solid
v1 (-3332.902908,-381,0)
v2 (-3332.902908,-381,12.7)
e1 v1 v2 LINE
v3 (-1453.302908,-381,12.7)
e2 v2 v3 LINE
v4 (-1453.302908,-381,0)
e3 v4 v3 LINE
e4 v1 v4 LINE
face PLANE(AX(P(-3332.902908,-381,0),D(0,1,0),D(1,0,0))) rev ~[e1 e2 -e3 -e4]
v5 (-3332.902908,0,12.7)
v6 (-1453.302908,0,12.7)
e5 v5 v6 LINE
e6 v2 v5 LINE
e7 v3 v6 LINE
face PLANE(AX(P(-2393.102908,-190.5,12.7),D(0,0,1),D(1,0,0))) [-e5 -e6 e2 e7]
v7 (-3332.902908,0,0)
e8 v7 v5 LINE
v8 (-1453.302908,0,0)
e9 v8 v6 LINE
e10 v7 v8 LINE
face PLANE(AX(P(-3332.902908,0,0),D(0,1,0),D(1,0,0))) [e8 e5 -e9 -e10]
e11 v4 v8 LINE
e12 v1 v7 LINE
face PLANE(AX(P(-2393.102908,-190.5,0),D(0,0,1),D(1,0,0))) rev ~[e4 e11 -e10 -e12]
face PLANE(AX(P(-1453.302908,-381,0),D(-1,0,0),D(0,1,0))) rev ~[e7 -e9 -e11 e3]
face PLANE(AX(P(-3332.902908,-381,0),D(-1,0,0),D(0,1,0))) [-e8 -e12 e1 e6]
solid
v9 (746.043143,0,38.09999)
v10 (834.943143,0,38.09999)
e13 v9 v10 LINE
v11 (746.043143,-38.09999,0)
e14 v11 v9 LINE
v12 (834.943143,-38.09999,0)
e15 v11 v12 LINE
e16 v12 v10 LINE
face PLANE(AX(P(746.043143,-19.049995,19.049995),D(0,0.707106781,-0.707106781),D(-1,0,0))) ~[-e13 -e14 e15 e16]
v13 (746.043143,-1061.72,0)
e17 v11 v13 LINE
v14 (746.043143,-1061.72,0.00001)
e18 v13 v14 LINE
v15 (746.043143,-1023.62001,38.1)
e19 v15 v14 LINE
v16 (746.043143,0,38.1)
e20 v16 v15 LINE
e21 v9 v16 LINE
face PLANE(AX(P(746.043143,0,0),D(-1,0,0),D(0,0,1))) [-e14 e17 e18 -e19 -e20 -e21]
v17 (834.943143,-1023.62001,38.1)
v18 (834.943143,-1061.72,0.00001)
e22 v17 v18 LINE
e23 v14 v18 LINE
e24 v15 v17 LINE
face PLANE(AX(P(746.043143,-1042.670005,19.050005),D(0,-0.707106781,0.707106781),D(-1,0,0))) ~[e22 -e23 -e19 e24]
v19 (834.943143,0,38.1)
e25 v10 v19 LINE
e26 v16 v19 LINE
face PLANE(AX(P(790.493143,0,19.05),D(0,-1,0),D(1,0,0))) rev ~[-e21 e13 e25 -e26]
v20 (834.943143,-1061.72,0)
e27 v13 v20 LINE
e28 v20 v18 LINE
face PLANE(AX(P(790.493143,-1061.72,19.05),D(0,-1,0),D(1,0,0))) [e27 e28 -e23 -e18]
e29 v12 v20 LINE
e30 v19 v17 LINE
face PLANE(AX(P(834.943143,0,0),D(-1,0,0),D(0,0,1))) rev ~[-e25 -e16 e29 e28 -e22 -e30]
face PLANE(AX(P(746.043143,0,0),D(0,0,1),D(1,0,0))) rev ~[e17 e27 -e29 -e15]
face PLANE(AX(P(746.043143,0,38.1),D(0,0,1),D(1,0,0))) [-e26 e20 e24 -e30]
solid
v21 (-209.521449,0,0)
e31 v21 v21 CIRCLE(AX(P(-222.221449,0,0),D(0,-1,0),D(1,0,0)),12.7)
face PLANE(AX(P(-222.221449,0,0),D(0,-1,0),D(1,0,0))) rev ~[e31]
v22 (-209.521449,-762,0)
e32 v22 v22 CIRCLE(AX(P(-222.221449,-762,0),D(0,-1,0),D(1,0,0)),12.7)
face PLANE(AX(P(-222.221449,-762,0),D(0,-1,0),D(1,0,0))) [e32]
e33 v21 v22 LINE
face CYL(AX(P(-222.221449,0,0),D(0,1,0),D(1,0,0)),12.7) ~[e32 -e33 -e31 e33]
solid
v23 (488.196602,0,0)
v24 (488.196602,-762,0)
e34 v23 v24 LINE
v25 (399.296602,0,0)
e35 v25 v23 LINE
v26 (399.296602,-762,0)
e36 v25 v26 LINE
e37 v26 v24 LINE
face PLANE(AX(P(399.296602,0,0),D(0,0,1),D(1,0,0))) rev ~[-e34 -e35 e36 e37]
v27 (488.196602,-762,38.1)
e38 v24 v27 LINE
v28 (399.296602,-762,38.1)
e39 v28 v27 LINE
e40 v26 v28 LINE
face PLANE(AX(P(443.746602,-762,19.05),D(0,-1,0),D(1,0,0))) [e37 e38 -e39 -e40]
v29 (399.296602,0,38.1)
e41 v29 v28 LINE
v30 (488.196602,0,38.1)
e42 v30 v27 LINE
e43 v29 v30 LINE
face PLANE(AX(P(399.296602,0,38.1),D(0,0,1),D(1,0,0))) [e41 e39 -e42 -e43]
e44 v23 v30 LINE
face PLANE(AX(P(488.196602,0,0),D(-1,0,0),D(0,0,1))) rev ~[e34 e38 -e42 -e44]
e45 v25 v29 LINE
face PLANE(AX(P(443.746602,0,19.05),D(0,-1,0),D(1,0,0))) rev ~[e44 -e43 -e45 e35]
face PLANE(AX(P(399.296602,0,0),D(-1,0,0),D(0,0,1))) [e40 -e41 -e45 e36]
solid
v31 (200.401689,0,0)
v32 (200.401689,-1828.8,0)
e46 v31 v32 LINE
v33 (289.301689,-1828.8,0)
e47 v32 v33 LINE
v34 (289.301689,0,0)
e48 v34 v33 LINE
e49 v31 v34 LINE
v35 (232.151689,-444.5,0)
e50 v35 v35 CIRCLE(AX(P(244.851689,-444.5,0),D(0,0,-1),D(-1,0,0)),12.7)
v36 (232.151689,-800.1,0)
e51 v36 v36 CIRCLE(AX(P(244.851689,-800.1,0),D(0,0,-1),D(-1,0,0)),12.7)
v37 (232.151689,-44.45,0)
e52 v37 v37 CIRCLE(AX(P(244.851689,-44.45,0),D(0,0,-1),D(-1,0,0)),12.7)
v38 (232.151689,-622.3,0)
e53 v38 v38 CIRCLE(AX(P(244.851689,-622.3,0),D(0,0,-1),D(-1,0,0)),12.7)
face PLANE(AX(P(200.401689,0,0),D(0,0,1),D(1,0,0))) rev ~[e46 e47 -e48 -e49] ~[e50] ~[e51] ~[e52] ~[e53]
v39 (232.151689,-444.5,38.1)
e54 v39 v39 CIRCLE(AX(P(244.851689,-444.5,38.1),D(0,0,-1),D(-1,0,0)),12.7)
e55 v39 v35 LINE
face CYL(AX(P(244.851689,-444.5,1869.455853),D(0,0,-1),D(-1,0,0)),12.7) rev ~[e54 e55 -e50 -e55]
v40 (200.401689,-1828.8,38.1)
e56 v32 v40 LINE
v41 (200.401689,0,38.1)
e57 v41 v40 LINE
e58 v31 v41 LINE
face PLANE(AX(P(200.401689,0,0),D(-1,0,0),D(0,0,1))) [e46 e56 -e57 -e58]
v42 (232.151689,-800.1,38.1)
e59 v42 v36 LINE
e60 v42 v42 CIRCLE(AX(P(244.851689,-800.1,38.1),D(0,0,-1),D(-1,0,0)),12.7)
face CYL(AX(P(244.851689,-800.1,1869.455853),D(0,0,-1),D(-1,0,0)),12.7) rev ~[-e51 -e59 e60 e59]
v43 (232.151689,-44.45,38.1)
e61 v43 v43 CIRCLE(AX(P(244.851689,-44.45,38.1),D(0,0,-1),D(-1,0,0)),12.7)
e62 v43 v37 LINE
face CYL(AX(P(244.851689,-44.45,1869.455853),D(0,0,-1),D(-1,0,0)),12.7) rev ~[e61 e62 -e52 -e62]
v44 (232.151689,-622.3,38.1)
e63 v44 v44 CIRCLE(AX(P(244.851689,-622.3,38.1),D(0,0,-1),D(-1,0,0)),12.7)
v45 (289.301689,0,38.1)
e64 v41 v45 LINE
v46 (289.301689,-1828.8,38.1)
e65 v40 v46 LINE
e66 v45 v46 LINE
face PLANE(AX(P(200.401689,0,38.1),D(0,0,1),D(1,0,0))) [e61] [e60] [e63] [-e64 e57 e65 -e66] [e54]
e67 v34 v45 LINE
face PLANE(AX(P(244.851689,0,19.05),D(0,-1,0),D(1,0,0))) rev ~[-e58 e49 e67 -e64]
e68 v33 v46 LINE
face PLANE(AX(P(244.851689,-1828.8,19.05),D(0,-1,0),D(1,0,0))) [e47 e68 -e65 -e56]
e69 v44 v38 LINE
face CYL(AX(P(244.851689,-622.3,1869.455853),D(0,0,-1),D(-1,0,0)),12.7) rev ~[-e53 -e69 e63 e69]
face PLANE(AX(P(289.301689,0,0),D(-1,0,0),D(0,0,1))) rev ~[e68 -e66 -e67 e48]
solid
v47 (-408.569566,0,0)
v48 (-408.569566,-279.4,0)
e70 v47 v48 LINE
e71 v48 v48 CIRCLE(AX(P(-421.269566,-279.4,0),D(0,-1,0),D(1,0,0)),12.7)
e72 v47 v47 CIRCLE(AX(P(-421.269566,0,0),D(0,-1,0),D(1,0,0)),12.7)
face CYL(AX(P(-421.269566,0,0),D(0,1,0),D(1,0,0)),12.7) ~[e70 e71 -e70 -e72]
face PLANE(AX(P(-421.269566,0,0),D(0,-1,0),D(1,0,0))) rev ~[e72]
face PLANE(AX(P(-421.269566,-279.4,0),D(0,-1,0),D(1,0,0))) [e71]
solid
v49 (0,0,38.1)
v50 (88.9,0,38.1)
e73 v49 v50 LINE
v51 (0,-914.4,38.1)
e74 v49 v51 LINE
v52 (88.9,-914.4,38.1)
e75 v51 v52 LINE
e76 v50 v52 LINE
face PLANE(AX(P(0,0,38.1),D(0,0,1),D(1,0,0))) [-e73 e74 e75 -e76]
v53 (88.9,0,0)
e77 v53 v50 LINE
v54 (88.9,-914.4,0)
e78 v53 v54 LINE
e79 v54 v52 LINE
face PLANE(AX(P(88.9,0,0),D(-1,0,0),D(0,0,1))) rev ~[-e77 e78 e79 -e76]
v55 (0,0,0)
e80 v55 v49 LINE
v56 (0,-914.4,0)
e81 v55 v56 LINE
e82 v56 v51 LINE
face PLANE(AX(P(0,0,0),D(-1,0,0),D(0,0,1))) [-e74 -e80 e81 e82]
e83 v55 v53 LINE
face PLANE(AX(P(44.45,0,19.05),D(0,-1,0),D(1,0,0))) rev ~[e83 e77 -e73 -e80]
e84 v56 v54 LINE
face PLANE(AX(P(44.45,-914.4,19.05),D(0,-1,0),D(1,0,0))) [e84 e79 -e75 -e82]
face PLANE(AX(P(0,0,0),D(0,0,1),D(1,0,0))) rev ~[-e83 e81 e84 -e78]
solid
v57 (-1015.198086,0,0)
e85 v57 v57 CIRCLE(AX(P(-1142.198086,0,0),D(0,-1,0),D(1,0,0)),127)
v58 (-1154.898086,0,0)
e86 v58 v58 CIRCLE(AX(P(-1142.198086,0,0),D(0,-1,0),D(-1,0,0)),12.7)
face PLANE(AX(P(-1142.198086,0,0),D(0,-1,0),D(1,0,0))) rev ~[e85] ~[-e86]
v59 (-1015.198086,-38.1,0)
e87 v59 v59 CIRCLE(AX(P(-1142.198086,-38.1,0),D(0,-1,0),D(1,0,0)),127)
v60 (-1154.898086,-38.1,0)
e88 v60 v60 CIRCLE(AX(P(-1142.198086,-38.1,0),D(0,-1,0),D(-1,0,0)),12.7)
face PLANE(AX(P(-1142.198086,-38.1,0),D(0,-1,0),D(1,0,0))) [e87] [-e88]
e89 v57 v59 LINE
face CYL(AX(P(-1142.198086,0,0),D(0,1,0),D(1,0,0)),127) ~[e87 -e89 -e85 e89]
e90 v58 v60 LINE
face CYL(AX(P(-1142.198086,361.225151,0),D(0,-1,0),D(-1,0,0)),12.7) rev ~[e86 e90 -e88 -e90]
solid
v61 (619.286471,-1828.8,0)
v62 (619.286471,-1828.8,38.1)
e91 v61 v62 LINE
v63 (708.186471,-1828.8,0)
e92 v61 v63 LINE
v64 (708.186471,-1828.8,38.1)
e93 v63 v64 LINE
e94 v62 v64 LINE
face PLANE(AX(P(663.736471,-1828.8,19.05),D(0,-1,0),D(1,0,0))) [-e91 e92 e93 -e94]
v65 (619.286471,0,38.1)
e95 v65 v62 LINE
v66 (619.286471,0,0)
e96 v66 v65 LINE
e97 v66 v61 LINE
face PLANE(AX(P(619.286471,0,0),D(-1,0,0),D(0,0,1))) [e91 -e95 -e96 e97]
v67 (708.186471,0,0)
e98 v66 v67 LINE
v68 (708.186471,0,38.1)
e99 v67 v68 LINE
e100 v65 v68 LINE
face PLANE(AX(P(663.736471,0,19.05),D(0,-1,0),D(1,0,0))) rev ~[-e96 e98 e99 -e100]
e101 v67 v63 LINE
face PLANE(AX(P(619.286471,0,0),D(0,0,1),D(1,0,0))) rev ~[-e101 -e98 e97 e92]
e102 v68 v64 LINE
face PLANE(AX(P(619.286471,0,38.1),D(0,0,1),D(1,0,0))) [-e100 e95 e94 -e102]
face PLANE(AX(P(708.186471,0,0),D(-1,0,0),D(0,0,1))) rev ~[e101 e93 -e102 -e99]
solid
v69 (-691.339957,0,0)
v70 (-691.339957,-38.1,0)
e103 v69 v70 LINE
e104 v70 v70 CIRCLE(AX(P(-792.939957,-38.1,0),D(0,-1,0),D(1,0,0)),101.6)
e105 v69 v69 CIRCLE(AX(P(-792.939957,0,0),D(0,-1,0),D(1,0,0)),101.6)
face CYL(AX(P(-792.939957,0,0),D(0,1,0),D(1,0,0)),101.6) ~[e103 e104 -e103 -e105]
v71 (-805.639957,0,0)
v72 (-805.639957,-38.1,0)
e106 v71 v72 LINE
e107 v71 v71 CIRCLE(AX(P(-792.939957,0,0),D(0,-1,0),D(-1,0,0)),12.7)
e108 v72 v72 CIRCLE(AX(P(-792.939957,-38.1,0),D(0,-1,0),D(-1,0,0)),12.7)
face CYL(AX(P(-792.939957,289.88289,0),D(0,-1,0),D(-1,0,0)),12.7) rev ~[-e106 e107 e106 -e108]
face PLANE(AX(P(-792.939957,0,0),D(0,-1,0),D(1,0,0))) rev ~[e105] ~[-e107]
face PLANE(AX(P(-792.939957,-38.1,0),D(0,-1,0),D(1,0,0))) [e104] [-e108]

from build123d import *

# Parameters (mm, degrees)
F0_W      = 88.9
F0_H      = 38.1
F1_DEPTH  = 914.4
F2_DEPTH  = 1828.8
F3_DEPTH  = 762
F5_D      = 25.4
F6_W      = 1879.6
F6_H      = 381
F7_DEPTH  = 12.7
F8_R      = 12.7
F9_DEPTH  = 762
F10_DEPTH = 279.4
F11_R     = 101.6
F12_DEPTH = 38.1
F11_R_2   = 127
F13_DEPTH = 38.1
F14_D     = 25.4
F15_D     = 25.4
F16_W     = 88.9
F16_H     = 38.1
F17_DEPTH = 1061.72
F18_SIZE  = 38.09999


# Not quite as in the source:
# - a fillet or chamfer is up to 0.001 mm smaller than in the source, because OpenCascade refuses the exact size


with BuildPart() as f1:
    # F0 (on Front) → F1 (new body)
    with BuildSketch(Plane.XZ):
        with Locations((44.45, 19.05)):
            Rectangle(F0_W, F0_H)
    extrude(amount=F1_DEPTH)


with BuildPart() as f2:
    # F0 (on Front) → F2 (new body)
    with BuildSketch(Plane.XZ):
        with Locations((244.851688537, 19.05)):
            Rectangle(F0_W, F0_H)
    extrude(amount=F2_DEPTH)

    # F5 (through all)
    with Locations(Plane.XY.offset(38.1)):
        with Locations((244.851688537, -44.45), (244.851688537, -444.5), (244.851688537, -622.3), (244.851688537, -800.1)):
            Hole(F5_D / 2)


with BuildPart() as f2b:
    # F0 (on Front) → F2, piece 2 (new body)
    with BuildSketch(Plane.XZ):
        with Locations((663.7364707975, 19.05)):
            Rectangle(F0_W, F0_H)
    extrude(amount=F2_DEPTH)


with BuildPart() as f3:
    # F0 (on Front) → F3 (new body)
    with BuildSketch(Plane.XZ):
        with Locations((443.7466020195, 19.05)):
            Rectangle(F0_W, F0_H)
    extrude(amount=F3_DEPTH)


with BuildPart() as f7:
    # F6 (on Top) → F7 (new body)
    with BuildSketch(Plane.XY):
        with Locations((-2393.1029083252, -190.5)):
            Rectangle(F6_W, F6_H)
    extrude(amount=F7_DEPTH)


with BuildPart() as f9:
    # F8 (on Front) → F9 (new body)
    with BuildSketch(Plane.XZ):
        with Locations((-222.2214488977, 0)):
            Circle(F8_R)
    extrude(amount=F9_DEPTH)


with BuildPart() as f10:
    # F8 (on Front) → F10 (new body)
    with BuildSketch(Plane.XZ):
        with Locations((-421.2695658207, 0)):
            Circle(F8_R)
    extrude(amount=F10_DEPTH)


with BuildPart() as f12:
    # F11 (on Front) → F12 (new body)
    with BuildSketch(Plane.XZ):
        with Locations((-792.9399567111, 0)):
            Circle(F11_R)
    extrude(amount=F12_DEPTH)

    # F14 (through all)
    with Locations(Plane(origin=(0, 0, 0), x_dir=(1, 0, 0), z_dir=(0, 1, 0))):
        with Locations((-792.9399567111, 0), (-1142.1980857849, 0)):
            Hole(F14_D / 2)


with BuildPart() as f13:
    # F11 (on Front) → F13 (new body)
    with BuildSketch(Plane.XZ):
        with Locations((-1142.1980857849, 0)):
            Circle(F11_R_2)
    extrude(amount=F13_DEPTH)

    # F15 (through all)
    with Locations(Plane(origin=(0, 0, 0), x_dir=(1, 0, 0), z_dir=(0, 1, 0))):
        with Locations((-1142.1980857849, 0)):
            Hole(F15_D / 2)


with BuildPart() as f17:
    # F16 (on Front) → F17 (new body)
    with BuildSketch(Plane.XZ):
        with Locations((790.4931433541, 19.05)):
            Rectangle(F16_W, F16_H)
    extrude(amount=F17_DEPTH)

    # F18 (size 38.1 in the source; OpenCascade refuses exactly that, so slightly less here)
    f18_edges = [f17.edges().sort_by_distance(p)[0] for p in [
        (790.493143, -1061.72, 38.1),
        (790.493143, 0, 0),
    ]]
    chamfer(f18_edges, length=F18_SIZE)


solid = Compound([f1.part, f2.part, f2b.part, f3.part, f7.part, f9.part, f10.part, f12.part, f13.part, f17.part])
